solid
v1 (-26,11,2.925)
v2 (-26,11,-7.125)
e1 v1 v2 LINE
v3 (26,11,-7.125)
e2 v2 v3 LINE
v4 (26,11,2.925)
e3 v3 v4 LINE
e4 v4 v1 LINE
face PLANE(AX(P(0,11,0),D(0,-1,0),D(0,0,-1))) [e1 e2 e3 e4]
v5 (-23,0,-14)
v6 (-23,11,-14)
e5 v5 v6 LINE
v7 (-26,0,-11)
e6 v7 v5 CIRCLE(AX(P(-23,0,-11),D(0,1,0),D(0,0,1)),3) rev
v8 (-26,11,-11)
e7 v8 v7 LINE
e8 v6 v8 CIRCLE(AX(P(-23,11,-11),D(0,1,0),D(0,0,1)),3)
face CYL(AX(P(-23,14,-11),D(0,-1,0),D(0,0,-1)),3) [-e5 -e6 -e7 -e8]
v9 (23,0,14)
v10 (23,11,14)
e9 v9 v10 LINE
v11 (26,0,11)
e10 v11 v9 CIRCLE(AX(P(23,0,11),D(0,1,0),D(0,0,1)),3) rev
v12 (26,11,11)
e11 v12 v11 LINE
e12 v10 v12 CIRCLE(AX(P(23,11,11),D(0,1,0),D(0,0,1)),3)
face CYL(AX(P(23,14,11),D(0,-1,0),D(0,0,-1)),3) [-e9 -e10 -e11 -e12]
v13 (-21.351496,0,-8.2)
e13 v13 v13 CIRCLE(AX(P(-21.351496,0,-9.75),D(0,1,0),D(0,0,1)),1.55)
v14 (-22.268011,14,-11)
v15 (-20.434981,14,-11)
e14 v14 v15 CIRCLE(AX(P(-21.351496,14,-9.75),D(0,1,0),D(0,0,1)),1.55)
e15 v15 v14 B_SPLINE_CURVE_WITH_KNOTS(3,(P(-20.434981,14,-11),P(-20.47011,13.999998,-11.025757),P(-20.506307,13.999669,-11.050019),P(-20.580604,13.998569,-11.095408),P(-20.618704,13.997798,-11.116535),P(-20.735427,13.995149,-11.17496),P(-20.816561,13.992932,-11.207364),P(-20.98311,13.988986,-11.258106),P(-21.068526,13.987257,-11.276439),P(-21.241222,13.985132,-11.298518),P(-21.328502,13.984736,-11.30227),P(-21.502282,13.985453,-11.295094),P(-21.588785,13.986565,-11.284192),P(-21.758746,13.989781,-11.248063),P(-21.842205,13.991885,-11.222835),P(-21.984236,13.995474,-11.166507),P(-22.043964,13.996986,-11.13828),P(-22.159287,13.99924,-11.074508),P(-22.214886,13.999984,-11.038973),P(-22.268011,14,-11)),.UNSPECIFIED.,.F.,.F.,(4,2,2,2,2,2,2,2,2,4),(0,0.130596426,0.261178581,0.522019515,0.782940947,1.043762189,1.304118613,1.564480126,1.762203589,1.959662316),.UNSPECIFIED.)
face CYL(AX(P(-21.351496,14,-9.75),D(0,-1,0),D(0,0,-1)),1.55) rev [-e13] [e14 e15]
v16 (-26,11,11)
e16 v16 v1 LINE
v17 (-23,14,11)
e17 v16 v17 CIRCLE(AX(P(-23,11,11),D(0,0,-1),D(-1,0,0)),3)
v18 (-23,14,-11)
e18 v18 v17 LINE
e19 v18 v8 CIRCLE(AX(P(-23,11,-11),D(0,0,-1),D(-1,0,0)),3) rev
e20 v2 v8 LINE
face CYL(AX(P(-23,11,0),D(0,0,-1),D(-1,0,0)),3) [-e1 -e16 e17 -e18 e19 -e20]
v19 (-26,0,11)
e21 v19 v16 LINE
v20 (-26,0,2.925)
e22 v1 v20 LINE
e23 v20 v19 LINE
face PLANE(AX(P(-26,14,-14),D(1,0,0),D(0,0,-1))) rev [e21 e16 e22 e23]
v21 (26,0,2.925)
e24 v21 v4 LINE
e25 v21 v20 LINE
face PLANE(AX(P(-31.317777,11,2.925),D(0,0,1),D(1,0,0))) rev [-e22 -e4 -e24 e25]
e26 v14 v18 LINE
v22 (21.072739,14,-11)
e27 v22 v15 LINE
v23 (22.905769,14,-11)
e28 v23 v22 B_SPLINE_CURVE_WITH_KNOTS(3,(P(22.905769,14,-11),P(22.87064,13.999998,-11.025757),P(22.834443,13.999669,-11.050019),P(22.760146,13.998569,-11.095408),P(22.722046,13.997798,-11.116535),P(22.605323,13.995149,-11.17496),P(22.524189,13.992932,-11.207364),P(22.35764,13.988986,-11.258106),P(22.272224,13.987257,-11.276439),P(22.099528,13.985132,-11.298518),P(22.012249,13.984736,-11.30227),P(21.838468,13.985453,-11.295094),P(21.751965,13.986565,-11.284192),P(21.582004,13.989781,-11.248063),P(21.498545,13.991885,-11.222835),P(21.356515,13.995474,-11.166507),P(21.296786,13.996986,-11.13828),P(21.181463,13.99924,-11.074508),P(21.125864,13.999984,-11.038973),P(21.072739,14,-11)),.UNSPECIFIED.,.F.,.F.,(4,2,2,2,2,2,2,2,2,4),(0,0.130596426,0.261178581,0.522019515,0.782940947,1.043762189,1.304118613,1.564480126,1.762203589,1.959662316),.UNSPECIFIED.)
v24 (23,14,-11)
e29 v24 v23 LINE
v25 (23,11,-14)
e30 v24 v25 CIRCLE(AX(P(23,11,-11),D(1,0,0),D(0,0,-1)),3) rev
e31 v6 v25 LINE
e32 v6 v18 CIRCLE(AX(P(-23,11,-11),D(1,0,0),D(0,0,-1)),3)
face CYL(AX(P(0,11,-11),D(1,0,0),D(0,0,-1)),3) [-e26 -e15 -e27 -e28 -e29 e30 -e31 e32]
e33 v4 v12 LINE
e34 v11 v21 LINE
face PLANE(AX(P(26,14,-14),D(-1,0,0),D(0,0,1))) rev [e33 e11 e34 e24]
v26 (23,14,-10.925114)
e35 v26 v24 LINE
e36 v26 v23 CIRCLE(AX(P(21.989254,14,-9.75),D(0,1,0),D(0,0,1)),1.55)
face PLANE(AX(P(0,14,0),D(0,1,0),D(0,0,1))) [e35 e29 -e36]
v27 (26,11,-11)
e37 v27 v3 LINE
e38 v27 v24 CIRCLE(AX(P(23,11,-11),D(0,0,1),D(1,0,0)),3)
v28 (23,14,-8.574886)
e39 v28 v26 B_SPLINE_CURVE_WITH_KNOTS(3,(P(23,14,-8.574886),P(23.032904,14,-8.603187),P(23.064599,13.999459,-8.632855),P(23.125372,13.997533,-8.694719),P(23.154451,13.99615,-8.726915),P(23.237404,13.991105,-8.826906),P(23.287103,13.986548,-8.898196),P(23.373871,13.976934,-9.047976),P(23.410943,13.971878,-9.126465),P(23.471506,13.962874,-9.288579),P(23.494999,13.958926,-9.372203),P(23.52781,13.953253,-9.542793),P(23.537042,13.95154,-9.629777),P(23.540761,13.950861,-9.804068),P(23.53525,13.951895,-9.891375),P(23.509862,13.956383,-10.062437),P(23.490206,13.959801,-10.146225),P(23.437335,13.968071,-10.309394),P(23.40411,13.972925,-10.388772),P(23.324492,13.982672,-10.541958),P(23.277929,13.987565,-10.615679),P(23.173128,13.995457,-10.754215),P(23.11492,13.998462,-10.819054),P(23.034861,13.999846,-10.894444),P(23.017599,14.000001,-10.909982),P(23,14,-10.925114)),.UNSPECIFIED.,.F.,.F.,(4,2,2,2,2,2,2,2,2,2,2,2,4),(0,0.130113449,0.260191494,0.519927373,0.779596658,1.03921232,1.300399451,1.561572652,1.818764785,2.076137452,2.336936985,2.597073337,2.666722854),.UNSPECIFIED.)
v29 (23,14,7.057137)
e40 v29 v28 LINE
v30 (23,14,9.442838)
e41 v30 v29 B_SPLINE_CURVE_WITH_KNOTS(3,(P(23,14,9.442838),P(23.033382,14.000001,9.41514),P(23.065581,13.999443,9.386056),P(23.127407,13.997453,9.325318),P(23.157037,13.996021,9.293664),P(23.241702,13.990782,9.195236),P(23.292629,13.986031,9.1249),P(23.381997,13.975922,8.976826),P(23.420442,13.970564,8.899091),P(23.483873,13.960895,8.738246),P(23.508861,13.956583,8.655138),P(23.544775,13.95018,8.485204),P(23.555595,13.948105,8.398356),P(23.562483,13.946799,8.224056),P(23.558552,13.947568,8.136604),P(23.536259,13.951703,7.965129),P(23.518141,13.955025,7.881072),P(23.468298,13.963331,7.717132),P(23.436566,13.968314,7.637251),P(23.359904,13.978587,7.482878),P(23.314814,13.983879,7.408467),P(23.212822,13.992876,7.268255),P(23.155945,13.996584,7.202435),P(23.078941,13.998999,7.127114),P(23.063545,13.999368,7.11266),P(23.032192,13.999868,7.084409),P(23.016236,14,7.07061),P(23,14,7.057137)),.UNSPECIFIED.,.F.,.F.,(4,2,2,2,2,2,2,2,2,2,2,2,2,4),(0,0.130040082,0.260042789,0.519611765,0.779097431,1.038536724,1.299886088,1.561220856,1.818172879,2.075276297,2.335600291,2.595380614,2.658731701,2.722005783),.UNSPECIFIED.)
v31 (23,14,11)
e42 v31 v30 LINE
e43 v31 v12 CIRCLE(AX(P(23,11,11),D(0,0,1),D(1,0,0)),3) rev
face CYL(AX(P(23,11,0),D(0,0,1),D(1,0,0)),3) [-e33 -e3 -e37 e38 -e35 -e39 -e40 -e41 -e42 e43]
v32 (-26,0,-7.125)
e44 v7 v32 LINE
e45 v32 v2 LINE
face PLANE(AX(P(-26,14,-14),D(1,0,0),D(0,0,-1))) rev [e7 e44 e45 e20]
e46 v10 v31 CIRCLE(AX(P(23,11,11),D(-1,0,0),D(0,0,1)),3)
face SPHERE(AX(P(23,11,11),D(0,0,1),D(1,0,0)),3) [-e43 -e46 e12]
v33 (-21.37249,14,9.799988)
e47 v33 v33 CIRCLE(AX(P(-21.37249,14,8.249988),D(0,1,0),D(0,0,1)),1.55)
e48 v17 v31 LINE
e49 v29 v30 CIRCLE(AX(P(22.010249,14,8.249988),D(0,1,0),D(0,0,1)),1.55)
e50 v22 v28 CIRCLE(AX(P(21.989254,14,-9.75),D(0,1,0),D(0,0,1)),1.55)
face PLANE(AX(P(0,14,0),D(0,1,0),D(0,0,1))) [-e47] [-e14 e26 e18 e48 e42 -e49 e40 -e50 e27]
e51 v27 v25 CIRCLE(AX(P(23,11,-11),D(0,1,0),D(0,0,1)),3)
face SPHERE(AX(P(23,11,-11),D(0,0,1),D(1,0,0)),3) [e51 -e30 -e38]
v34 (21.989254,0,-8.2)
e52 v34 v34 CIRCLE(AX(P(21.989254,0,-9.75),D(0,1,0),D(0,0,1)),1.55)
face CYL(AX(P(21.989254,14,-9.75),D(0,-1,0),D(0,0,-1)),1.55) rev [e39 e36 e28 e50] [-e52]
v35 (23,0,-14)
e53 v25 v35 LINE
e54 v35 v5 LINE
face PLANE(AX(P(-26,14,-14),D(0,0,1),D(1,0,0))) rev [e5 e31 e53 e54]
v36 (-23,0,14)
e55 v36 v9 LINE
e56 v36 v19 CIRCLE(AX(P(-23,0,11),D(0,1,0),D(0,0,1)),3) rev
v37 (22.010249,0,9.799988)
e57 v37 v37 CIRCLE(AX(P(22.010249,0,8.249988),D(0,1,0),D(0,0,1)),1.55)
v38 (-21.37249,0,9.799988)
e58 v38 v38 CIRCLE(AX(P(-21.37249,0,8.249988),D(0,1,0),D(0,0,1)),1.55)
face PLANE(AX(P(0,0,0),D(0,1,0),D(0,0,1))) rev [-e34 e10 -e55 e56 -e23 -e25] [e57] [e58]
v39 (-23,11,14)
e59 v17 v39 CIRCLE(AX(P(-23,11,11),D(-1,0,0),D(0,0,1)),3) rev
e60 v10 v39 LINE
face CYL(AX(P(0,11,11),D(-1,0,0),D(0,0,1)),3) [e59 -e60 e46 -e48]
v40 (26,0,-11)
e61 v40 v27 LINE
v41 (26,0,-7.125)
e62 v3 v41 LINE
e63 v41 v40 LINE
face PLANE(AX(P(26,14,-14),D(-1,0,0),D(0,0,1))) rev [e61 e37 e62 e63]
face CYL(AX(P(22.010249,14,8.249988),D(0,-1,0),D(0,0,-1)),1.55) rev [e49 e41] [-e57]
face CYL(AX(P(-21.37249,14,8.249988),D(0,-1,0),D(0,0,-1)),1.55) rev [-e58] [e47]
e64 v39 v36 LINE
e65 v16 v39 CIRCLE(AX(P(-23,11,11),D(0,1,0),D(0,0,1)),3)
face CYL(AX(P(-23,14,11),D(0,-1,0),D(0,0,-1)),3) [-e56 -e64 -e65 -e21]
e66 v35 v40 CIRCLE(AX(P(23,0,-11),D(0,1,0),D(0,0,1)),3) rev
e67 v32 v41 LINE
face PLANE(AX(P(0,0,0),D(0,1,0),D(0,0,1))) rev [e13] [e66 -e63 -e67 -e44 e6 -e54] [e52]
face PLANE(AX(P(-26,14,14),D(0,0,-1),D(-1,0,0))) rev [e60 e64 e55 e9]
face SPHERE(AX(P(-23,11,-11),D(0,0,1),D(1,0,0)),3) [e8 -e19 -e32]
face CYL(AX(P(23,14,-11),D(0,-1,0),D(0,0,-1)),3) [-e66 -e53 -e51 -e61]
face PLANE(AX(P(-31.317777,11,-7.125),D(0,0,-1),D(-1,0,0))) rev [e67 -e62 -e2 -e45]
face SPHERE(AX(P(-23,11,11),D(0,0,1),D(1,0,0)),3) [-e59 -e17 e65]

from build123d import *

# Parameters (mm, degrees)
CROQUIS1_W              = 52
CROQUIS1_H              = 28
CROQUIS1_R              = 1.55
SALIENTE_EXTRUIR1_DEPTH = 14
CROQUIS2_W              = 62.635554568
CROQUIS2_H              = 10.05
CORTAR_EXTRUIR1_DEPTH   = 11
REDONDEO2_START         = -14
REDONDEO2_DEPTH         = 28
REDONDEO2_START_2       = -27
REDONDEO2_2_DEPTH       = 54
REDONDEO3_R             = 3


with BuildPart() as part:
    # Croquis1 → Saliente-Extruir1 (new body)
    with BuildSketch(Plane(origin=(0, 0, 0), x_dir=(1, 0, 0), z_dir=(0, 1, 0))):
        Rectangle(CROQUIS1_W, CROQUIS1_H)
        with Locations(Location((-21.372490304, -8.249987757, 0), (0, 0, 270))):
            Circle(CROQUIS1_R, mode=Mode.SUBTRACT)
        with Locations(Location((22.010248646, -8.249987757, 0), (0, 0, 270))):
            Circle(CROQUIS1_R, mode=Mode.SUBTRACT)
        with Locations(Location((-21.351495904, 9.75, 0), (0, 0, 270))):
            Circle(CROQUIS1_R, mode=Mode.SUBTRACT)
        with Locations(Location((21.989254247, 9.75, 0), (0, 0, 270))):
            Circle(CROQUIS1_R, mode=Mode.SUBTRACT)
    extrude(amount=SALIENTE_EXTRUIR1_DEPTH)

    # Croquis2 → Cortar-Extruir1 (cut)
    with BuildSketch(Plane.XZ):
        with Locations((0, -2.1)):
            Rectangle(CROQUIS2_W, CROQUIS2_H)
    extrude(amount=-CORTAR_EXTRUIR1_DEPTH, mode=Mode.SUBTRACT)

    # Redondeo2: read off the stored shape, not the designer's step
    # Redondeo2 outline → Redondeo2 (cut)
    with BuildSketch(Plane.XY.offset(REDONDEO2_START)):
        with BuildLine():
            ThreePointArc((-26, 11), (-25.121320344, 13.121320344), (-23, 14))
            Line((-23, 14), (-26, 14))
            Line((-26, 14), (-26, 11))
        make_face()
        with BuildLine():
            ThreePointArc((23, 14), (25.121320344, 13.121320344), (26, 11))
            Line((26, 11), (26, 14))
            Line((26, 14), (23, 14))
        make_face()
    extrude(amount=REDONDEO2_DEPTH, mode=Mode.SUBTRACT)

    # Redondeo2 2 outline → Redondeo2 2 (cut)
    with BuildSketch(Plane.YZ.offset(REDONDEO2_START_2)):
        with BuildLine():
            ThreePointArc((11, 14), (13.121320344, 13.121320344), (14, 11))
            Line((14, 11), (14, 14))
            Line((14, 14), (11, 14))
        make_face()
        with BuildLine():
            ThreePointArc((14, -11), (13.121320344, -13.121320344), (11, -14))
            Line((11, -14), (14, -14))
            Line((14, -14), (14, -11))
        make_face()
    extrude(amount=REDONDEO2_2_DEPTH, mode=Mode.SUBTRACT)

    # Redondeo3
    # the kernel refuses this fillet: 3 mm, written as the material it takes off along each edge
    with BuildSketch(Plane(origin=(23, 11, -11), x_dir=(1, 0, 0), z_dir=(0, 0, -1))) as redondeo3_piece_1_section:
        Polygon((0, 0), (REDONDEO3_R, 0), (REDONDEO3_R, -REDONDEO3_R), (0, -REDONDEO3_R), align=None)
    redondeo3_piece_1 = extrude(amount=REDONDEO3_R, mode=Mode.PRIVATE)
    redondeo3_piece_1 = redondeo3_piece_1 - Plane(origin=(23, 11, -11), x_dir=(-0.7071067811865475, -0.7071067811865475, 0), z_dir=(0, 0, -1)) * Sphere(REDONDEO3_R, mode=Mode.PRIVATE)
    add(redondeo3_piece_1, mode=Mode.SUBTRACT)
    with BuildSketch(Plane(origin=(23, 11, 11), x_dir=(0, 0, 1), z_dir=(1, 0, 0))) as redondeo3_piece_2_section:
        Polygon((0, 0), (REDONDEO3_R, 0), (REDONDEO3_R, -REDONDEO3_R), (0, -REDONDEO3_R), align=None)
    redondeo3_piece_2 = extrude(amount=REDONDEO3_R, mode=Mode.PRIVATE)
    redondeo3_piece_2 = redondeo3_piece_2 - Plane(origin=(23, 11, 11), x_dir=(0, -0.7071067811865475, -0.7071067811865475), z_dir=(1, 0, 0)) * Sphere(REDONDEO3_R, mode=Mode.PRIVATE)
    add(redondeo3_piece_2, mode=Mode.SUBTRACT)
    with BuildSketch(Plane(origin=(-23, 11, -11), x_dir=(-1, 0, 0), z_dir=(0, 0, -1))) as redondeo3_piece_3_section:
        Polygon((0, 0), (REDONDEO3_R, 0), (REDONDEO3_R, REDONDEO3_R), (0, REDONDEO3_R), align=None)
    redondeo3_piece_3 = extrude(amount=REDONDEO3_R, mode=Mode.PRIVATE)
    redondeo3_piece_3 = redondeo3_piece_3 - Plane(origin=(-23, 11, -11), x_dir=(0.7071067811865475, -0.7071067811865475, 0), z_dir=(0, 0, -1)) * Sphere(REDONDEO3_R, mode=Mode.PRIVATE)
    add(redondeo3_piece_3, mode=Mode.SUBTRACT)
    with BuildSketch(Plane(origin=(-23, 11, 11), x_dir=(0, 0, 1), z_dir=(-1, 0, 0))) as redondeo3_piece_4_section:
        Polygon((0, 0), (REDONDEO3_R, 0), (REDONDEO3_R, REDONDEO3_R), (0, REDONDEO3_R), align=None)
    redondeo3_piece_4 = extrude(amount=REDONDEO3_R, mode=Mode.PRIVATE)
    redondeo3_piece_4 = redondeo3_piece_4 - Plane(origin=(-23, 11, 11), x_dir=(0, -0.7071067811865475, -0.7071067811865475), z_dir=(-1, 0, 0)) * Sphere(REDONDEO3_R, mode=Mode.PRIVATE)
    add(redondeo3_piece_4, mode=Mode.SUBTRACT)
    with BuildSketch(Plane(origin=(-26, -7.5, 14), x_dir=(0, 0, -1), z_dir=(0, 1, 0)), Plane(origin=(-26, -7.5, -14), x_dir=(1, 0, 0), z_dir=(0, 1, 0))) as redondeo3_piece_5:
        with BuildLine():
            CenterArc((REDONDEO3_R, -REDONDEO3_R), REDONDEO3_R, 90, 90)
            Line((0, -REDONDEO3_R), (0, 0))
            Line((0, 0), (REDONDEO3_R, 0))
        make_face()
    extrude(amount=18.5, mode=Mode.SUBTRACT)
    with BuildSketch(Plane(origin=(26, -7.5, -14), x_dir=(-1, 0, 0), z_dir=(0, 1, 0)), Plane(origin=(26, -7.5, 14), x_dir=(0, 0, -1), z_dir=(0, 1, 0))) as redondeo3_piece_6:
        with BuildLine():
            CenterArc((REDONDEO3_R, REDONDEO3_R), REDONDEO3_R, 180, 90)
            Line((0, REDONDEO3_R), (0, 0))
            Line((0, 0), (REDONDEO3_R, 0))
        make_face()
    extrude(amount=18.5, mode=Mode.SUBTRACT)


solid = part.part
